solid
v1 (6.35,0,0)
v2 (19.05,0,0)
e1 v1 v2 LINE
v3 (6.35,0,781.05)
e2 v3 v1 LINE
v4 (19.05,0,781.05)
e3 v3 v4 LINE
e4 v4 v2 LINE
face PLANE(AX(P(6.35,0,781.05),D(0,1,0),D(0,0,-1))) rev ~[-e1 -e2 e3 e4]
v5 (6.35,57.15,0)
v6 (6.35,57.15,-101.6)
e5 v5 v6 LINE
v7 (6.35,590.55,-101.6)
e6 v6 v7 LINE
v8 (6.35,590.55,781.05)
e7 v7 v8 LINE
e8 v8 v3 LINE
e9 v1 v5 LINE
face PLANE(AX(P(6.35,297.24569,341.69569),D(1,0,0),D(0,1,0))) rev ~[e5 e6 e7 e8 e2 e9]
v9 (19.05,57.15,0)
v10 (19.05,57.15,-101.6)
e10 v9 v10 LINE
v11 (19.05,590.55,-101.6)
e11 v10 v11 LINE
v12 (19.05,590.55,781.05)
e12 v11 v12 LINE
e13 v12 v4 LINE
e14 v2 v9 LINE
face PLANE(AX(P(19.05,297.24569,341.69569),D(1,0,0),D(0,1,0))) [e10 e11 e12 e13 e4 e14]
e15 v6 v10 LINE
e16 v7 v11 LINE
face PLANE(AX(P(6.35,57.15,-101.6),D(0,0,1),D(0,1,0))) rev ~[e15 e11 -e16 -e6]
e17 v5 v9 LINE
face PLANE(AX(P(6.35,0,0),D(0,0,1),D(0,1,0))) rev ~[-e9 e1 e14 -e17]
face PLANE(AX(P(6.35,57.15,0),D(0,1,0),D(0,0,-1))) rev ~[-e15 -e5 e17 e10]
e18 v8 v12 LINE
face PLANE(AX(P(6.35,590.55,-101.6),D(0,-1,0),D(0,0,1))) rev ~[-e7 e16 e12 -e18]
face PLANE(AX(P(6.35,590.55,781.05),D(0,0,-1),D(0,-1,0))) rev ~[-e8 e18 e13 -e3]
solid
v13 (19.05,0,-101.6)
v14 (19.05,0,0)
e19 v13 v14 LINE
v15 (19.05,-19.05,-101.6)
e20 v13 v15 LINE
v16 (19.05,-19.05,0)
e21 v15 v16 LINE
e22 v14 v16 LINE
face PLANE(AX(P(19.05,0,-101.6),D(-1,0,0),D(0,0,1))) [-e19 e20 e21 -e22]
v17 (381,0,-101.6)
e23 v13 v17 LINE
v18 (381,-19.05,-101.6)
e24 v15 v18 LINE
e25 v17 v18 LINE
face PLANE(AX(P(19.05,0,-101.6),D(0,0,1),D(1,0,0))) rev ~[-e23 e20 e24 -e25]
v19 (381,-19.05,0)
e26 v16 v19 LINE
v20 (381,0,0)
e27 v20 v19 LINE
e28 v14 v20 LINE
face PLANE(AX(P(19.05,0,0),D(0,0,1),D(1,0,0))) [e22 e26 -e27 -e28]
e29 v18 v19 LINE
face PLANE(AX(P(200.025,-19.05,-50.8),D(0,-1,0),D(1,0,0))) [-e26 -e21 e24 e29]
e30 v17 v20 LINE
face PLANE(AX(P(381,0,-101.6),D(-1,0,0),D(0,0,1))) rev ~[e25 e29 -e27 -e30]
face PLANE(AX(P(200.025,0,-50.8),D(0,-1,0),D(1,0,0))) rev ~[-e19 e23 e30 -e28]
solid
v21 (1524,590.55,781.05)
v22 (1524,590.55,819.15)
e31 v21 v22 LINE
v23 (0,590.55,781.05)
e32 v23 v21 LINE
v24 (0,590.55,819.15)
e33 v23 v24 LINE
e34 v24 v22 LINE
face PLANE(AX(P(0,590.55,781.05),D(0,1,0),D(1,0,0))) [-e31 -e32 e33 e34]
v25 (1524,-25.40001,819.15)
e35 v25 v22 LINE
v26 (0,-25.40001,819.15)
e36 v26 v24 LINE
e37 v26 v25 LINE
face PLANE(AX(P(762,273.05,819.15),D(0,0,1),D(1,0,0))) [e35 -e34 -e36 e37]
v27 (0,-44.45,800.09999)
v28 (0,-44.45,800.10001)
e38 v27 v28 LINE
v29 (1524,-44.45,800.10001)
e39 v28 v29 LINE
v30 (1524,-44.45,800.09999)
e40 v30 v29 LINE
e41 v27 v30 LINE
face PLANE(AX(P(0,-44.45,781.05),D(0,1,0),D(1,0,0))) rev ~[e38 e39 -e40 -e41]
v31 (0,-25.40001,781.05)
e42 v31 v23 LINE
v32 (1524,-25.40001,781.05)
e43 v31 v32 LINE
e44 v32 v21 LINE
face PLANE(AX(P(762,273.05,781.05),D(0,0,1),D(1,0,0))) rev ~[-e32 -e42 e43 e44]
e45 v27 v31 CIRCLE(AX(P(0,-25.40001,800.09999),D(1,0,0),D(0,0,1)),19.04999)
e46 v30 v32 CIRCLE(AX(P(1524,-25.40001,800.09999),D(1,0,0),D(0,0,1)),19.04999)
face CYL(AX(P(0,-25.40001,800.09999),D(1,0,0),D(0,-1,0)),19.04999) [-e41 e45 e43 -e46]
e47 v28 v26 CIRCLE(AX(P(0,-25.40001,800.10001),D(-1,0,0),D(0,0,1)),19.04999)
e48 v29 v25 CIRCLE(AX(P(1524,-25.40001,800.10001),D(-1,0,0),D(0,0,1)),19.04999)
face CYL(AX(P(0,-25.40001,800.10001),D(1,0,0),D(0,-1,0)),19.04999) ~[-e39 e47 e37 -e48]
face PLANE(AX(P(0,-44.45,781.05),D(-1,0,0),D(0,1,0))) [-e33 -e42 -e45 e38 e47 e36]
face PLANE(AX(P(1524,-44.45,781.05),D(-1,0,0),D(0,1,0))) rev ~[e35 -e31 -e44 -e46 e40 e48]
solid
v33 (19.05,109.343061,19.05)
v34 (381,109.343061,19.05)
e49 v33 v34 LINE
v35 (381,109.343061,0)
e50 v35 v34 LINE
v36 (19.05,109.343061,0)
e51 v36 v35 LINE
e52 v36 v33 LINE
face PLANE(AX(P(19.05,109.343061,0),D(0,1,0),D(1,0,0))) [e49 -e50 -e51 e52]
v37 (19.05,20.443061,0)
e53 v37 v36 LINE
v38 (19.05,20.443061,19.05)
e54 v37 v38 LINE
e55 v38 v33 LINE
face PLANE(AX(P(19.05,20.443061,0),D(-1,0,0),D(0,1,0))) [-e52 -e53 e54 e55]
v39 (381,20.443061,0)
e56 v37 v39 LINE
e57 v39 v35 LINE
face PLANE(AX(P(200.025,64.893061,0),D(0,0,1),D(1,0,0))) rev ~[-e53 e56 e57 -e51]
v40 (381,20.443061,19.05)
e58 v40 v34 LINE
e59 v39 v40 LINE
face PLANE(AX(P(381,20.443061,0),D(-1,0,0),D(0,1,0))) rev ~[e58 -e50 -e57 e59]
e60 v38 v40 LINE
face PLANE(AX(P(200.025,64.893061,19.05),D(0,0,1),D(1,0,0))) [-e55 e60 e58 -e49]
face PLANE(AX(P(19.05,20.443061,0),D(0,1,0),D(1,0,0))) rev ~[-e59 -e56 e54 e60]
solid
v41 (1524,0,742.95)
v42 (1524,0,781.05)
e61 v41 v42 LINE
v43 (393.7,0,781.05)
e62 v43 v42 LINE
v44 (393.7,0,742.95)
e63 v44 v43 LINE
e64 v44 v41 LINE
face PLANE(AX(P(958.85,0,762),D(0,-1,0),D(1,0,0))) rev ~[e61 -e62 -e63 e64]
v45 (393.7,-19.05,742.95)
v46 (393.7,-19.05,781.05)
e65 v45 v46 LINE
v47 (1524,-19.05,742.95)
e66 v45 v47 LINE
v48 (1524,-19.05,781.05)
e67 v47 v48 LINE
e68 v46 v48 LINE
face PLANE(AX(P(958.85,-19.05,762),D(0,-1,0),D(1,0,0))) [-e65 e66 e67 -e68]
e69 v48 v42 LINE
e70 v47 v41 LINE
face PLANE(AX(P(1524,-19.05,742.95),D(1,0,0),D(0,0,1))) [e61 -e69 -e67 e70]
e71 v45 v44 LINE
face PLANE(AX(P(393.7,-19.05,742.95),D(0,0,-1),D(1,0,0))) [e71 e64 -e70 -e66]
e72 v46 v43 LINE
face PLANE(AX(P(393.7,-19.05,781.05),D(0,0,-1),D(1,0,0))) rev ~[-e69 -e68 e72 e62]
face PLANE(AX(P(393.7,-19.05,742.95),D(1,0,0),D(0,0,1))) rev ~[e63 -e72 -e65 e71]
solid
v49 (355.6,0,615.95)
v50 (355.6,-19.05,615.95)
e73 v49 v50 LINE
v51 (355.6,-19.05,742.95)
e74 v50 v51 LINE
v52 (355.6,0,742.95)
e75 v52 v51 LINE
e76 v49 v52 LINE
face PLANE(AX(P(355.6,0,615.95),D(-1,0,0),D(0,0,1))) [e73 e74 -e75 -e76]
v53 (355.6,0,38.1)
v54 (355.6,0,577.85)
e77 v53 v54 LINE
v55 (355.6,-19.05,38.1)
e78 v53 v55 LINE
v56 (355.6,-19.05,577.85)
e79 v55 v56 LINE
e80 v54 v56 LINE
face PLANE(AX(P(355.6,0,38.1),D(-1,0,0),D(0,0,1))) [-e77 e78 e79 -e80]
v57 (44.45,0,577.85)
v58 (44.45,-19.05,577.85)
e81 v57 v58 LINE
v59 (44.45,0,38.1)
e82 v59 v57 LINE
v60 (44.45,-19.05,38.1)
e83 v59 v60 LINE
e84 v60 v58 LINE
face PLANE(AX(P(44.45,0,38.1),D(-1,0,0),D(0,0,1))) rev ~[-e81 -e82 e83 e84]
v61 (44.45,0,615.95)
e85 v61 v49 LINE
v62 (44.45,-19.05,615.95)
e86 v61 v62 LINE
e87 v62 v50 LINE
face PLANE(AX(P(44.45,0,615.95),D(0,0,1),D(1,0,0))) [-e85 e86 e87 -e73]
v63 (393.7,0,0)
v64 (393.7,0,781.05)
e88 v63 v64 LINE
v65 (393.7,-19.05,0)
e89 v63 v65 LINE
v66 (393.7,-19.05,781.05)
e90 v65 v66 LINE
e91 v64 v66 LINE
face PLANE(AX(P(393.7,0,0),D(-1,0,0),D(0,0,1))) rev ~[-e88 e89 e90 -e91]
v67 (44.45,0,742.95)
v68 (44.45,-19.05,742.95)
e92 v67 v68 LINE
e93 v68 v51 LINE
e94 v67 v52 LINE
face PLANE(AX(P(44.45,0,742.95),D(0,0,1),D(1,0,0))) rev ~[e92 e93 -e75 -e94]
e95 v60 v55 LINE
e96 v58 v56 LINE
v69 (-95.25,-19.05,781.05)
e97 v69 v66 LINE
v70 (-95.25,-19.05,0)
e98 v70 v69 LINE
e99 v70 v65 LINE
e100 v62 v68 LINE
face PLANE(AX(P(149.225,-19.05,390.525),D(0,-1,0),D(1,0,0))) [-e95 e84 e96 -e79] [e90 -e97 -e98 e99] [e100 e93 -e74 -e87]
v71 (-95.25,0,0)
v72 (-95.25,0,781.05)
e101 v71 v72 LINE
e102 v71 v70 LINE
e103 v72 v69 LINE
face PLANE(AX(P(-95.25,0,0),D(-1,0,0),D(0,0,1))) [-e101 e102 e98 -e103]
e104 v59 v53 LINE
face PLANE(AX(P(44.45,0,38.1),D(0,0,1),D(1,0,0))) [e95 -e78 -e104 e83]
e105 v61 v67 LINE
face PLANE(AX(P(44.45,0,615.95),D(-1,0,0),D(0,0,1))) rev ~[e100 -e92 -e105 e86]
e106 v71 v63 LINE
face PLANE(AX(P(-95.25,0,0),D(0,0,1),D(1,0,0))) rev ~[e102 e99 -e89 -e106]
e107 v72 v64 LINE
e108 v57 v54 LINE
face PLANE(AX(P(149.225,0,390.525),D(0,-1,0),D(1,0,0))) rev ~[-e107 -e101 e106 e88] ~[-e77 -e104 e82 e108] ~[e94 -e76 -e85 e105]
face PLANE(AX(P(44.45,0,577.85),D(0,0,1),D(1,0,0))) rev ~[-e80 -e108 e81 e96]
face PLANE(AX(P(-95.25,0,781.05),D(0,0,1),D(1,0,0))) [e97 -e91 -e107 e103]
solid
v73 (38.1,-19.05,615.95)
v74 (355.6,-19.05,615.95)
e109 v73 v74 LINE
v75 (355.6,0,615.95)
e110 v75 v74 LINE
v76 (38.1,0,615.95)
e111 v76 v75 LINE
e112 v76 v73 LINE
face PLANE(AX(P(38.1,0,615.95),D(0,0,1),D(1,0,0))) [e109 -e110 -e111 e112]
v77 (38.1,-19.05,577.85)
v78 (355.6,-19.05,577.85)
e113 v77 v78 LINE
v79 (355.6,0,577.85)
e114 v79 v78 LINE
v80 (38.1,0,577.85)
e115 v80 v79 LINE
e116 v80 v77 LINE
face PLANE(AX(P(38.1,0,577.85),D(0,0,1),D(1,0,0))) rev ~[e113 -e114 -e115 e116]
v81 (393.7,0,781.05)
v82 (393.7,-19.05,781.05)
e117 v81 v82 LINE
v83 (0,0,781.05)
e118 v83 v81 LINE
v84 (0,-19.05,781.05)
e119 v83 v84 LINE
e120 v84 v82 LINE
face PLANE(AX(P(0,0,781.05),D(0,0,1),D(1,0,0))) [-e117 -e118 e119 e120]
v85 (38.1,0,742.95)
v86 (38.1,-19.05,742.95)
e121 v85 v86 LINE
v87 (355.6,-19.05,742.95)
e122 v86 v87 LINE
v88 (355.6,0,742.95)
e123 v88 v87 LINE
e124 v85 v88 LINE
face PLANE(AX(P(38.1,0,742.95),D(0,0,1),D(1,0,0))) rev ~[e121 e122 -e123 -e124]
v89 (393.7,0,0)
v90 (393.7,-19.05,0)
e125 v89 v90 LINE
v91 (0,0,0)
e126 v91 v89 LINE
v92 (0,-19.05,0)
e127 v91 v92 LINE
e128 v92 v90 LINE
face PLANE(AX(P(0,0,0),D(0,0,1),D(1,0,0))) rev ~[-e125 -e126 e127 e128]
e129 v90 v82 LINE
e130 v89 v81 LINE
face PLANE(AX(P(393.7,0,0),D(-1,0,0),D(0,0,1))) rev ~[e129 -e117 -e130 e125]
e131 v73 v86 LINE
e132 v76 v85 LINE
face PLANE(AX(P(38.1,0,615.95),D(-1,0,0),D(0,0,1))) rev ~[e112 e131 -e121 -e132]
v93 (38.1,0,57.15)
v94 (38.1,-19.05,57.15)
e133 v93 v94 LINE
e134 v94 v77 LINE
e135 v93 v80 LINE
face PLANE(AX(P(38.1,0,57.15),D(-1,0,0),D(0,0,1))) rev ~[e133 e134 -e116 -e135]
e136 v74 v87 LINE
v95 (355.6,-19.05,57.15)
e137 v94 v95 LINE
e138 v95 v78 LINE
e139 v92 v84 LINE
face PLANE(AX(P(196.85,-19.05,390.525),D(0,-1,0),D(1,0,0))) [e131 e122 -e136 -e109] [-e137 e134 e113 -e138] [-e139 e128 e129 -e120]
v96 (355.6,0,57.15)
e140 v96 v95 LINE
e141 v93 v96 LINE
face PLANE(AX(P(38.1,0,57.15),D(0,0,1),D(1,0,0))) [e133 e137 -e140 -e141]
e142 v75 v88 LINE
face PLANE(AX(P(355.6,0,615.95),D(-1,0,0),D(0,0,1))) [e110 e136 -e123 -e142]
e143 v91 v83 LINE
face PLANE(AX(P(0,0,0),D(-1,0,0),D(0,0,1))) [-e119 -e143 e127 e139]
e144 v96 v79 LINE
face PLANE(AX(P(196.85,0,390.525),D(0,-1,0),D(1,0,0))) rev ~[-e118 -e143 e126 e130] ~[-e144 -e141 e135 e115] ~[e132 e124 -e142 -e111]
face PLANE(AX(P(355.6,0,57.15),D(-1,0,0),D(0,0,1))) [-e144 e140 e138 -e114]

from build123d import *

# Parameters (mm, degrees)
F3_W      = 393.7
F3_H      = 781.05
F3_W_2    = 317.5
F3_H_2    = 520.7
F3_H_3    = 127
F4_DEPTH  = 19.05
F7_DEPTH  = 12.7
F8_W      = 361.95
F8_H      = 101.6
F9_DEPTH  = 19.05
F10_W     = 361.95
F10_H     = 88.9
F11_DEPTH = 19.05
F12_W     = 1130.3
F12_H     = 38.1
F13_DEPTH = 19.05
F14_W     = 1524
F14_H     = 635
F15_DEPTH = 38.1
F16_R     = 19.04999
F17_W     = 488.95
F17_H     = 781.05
F17_W_2   = 311.15
F17_H_2   = 539.75
F17_H_3   = 127
F18_DEPTH = 19.05


# Not quite as in the source:
# - a variable given as a bare number and used for a length is read in inches; the dataset says mm whatever the document's units were
# - a fillet or chamfer is up to 0.001 mm smaller than in the source, because OpenCascade refuses the exact size


with BuildPart() as f4:
    # F3 (on Front) → F4 (new body)
    with BuildSketch(Plane.XZ):
        with Locations((196.85, 390.525)):
            Rectangle(F3_W, F3_H)
        with Locations((196.85, 317.5)):
            Rectangle(F3_W_2, F3_H_2, mode=Mode.SUBTRACT)
        with Locations((196.85, 679.45)):
            Rectangle(F3_W_2, F3_H_3, mode=Mode.SUBTRACT)
    extrude(amount=F4_DEPTH)


with BuildPart() as f7:
    # F6 (on offset) → F7 (new body)
    with BuildSketch(Plane.YZ.offset(6.35)):
        Polygon((590.55, 781.05), (0, 781.05), (0, 0), (57.15, 0), (57.15, -101.6), (590.55, -101.6), align=None)
    extrude(amount=F7_DEPTH)


with BuildPart() as f9:
    # F8 (on Front) → F9 (new body)
    with BuildSketch(Plane.XZ):
        with Locations((200.025, -50.8)):
            Rectangle(F8_W, F8_H)
    extrude(amount=F9_DEPTH)


with BuildPart() as f11:
    # F10 (on Top) → F11 (new body)
    with BuildSketch(Plane.XY):
        with Locations((200.025, 64.8930611602)):
            Rectangle(F10_W, F10_H)
    extrude(amount=F11_DEPTH)


with BuildPart() as f13:
    # F12 (on face) → F13 (new body, through all)
    with BuildSketch(Plane.XZ.offset(19.05)):
        with Locations((958.85, 762)):
            Rectangle(F12_W, F12_H)
    extrude(amount=-F13_DEPTH)


with BuildPart() as f15:
    # F14 (on face) → F15 (new body)
    with BuildSketch(Plane.XY.offset(781.05)):
        with Locations((762, 273.05)):
            Rectangle(F14_W, F14_H)
    extrude(amount=F15_DEPTH)

    # F16 (radius 19.05 in the source; OpenCascade refuses exactly that, so slightly less here)
    f16_edges = [f15.edges().sort_by_distance(p)[0] for p in [
        (762, -44.45, 819.15),
        (762, -44.45, 781.05),
    ]]
    fillet(f16_edges, radius=F16_R)


with BuildPart() as f18:
    # F17 (on face) → F18 (new body)
    with BuildSketch(Plane.XZ):
        with Locations((149.225, 390.525)):
            Rectangle(F17_W, F17_H)
        with Locations((200.025, 307.975)):
            Rectangle(F17_W_2, F17_H_2, mode=Mode.SUBTRACT)
        with Locations((200.025, 679.45)):
            Rectangle(F17_W_2, F17_H_3, mode=Mode.SUBTRACT)
    extrude(amount=F18_DEPTH)


solid = Compound([f4.part, f7.part, f9.part, f11.part, f13.part, f15.part, f18.part])
